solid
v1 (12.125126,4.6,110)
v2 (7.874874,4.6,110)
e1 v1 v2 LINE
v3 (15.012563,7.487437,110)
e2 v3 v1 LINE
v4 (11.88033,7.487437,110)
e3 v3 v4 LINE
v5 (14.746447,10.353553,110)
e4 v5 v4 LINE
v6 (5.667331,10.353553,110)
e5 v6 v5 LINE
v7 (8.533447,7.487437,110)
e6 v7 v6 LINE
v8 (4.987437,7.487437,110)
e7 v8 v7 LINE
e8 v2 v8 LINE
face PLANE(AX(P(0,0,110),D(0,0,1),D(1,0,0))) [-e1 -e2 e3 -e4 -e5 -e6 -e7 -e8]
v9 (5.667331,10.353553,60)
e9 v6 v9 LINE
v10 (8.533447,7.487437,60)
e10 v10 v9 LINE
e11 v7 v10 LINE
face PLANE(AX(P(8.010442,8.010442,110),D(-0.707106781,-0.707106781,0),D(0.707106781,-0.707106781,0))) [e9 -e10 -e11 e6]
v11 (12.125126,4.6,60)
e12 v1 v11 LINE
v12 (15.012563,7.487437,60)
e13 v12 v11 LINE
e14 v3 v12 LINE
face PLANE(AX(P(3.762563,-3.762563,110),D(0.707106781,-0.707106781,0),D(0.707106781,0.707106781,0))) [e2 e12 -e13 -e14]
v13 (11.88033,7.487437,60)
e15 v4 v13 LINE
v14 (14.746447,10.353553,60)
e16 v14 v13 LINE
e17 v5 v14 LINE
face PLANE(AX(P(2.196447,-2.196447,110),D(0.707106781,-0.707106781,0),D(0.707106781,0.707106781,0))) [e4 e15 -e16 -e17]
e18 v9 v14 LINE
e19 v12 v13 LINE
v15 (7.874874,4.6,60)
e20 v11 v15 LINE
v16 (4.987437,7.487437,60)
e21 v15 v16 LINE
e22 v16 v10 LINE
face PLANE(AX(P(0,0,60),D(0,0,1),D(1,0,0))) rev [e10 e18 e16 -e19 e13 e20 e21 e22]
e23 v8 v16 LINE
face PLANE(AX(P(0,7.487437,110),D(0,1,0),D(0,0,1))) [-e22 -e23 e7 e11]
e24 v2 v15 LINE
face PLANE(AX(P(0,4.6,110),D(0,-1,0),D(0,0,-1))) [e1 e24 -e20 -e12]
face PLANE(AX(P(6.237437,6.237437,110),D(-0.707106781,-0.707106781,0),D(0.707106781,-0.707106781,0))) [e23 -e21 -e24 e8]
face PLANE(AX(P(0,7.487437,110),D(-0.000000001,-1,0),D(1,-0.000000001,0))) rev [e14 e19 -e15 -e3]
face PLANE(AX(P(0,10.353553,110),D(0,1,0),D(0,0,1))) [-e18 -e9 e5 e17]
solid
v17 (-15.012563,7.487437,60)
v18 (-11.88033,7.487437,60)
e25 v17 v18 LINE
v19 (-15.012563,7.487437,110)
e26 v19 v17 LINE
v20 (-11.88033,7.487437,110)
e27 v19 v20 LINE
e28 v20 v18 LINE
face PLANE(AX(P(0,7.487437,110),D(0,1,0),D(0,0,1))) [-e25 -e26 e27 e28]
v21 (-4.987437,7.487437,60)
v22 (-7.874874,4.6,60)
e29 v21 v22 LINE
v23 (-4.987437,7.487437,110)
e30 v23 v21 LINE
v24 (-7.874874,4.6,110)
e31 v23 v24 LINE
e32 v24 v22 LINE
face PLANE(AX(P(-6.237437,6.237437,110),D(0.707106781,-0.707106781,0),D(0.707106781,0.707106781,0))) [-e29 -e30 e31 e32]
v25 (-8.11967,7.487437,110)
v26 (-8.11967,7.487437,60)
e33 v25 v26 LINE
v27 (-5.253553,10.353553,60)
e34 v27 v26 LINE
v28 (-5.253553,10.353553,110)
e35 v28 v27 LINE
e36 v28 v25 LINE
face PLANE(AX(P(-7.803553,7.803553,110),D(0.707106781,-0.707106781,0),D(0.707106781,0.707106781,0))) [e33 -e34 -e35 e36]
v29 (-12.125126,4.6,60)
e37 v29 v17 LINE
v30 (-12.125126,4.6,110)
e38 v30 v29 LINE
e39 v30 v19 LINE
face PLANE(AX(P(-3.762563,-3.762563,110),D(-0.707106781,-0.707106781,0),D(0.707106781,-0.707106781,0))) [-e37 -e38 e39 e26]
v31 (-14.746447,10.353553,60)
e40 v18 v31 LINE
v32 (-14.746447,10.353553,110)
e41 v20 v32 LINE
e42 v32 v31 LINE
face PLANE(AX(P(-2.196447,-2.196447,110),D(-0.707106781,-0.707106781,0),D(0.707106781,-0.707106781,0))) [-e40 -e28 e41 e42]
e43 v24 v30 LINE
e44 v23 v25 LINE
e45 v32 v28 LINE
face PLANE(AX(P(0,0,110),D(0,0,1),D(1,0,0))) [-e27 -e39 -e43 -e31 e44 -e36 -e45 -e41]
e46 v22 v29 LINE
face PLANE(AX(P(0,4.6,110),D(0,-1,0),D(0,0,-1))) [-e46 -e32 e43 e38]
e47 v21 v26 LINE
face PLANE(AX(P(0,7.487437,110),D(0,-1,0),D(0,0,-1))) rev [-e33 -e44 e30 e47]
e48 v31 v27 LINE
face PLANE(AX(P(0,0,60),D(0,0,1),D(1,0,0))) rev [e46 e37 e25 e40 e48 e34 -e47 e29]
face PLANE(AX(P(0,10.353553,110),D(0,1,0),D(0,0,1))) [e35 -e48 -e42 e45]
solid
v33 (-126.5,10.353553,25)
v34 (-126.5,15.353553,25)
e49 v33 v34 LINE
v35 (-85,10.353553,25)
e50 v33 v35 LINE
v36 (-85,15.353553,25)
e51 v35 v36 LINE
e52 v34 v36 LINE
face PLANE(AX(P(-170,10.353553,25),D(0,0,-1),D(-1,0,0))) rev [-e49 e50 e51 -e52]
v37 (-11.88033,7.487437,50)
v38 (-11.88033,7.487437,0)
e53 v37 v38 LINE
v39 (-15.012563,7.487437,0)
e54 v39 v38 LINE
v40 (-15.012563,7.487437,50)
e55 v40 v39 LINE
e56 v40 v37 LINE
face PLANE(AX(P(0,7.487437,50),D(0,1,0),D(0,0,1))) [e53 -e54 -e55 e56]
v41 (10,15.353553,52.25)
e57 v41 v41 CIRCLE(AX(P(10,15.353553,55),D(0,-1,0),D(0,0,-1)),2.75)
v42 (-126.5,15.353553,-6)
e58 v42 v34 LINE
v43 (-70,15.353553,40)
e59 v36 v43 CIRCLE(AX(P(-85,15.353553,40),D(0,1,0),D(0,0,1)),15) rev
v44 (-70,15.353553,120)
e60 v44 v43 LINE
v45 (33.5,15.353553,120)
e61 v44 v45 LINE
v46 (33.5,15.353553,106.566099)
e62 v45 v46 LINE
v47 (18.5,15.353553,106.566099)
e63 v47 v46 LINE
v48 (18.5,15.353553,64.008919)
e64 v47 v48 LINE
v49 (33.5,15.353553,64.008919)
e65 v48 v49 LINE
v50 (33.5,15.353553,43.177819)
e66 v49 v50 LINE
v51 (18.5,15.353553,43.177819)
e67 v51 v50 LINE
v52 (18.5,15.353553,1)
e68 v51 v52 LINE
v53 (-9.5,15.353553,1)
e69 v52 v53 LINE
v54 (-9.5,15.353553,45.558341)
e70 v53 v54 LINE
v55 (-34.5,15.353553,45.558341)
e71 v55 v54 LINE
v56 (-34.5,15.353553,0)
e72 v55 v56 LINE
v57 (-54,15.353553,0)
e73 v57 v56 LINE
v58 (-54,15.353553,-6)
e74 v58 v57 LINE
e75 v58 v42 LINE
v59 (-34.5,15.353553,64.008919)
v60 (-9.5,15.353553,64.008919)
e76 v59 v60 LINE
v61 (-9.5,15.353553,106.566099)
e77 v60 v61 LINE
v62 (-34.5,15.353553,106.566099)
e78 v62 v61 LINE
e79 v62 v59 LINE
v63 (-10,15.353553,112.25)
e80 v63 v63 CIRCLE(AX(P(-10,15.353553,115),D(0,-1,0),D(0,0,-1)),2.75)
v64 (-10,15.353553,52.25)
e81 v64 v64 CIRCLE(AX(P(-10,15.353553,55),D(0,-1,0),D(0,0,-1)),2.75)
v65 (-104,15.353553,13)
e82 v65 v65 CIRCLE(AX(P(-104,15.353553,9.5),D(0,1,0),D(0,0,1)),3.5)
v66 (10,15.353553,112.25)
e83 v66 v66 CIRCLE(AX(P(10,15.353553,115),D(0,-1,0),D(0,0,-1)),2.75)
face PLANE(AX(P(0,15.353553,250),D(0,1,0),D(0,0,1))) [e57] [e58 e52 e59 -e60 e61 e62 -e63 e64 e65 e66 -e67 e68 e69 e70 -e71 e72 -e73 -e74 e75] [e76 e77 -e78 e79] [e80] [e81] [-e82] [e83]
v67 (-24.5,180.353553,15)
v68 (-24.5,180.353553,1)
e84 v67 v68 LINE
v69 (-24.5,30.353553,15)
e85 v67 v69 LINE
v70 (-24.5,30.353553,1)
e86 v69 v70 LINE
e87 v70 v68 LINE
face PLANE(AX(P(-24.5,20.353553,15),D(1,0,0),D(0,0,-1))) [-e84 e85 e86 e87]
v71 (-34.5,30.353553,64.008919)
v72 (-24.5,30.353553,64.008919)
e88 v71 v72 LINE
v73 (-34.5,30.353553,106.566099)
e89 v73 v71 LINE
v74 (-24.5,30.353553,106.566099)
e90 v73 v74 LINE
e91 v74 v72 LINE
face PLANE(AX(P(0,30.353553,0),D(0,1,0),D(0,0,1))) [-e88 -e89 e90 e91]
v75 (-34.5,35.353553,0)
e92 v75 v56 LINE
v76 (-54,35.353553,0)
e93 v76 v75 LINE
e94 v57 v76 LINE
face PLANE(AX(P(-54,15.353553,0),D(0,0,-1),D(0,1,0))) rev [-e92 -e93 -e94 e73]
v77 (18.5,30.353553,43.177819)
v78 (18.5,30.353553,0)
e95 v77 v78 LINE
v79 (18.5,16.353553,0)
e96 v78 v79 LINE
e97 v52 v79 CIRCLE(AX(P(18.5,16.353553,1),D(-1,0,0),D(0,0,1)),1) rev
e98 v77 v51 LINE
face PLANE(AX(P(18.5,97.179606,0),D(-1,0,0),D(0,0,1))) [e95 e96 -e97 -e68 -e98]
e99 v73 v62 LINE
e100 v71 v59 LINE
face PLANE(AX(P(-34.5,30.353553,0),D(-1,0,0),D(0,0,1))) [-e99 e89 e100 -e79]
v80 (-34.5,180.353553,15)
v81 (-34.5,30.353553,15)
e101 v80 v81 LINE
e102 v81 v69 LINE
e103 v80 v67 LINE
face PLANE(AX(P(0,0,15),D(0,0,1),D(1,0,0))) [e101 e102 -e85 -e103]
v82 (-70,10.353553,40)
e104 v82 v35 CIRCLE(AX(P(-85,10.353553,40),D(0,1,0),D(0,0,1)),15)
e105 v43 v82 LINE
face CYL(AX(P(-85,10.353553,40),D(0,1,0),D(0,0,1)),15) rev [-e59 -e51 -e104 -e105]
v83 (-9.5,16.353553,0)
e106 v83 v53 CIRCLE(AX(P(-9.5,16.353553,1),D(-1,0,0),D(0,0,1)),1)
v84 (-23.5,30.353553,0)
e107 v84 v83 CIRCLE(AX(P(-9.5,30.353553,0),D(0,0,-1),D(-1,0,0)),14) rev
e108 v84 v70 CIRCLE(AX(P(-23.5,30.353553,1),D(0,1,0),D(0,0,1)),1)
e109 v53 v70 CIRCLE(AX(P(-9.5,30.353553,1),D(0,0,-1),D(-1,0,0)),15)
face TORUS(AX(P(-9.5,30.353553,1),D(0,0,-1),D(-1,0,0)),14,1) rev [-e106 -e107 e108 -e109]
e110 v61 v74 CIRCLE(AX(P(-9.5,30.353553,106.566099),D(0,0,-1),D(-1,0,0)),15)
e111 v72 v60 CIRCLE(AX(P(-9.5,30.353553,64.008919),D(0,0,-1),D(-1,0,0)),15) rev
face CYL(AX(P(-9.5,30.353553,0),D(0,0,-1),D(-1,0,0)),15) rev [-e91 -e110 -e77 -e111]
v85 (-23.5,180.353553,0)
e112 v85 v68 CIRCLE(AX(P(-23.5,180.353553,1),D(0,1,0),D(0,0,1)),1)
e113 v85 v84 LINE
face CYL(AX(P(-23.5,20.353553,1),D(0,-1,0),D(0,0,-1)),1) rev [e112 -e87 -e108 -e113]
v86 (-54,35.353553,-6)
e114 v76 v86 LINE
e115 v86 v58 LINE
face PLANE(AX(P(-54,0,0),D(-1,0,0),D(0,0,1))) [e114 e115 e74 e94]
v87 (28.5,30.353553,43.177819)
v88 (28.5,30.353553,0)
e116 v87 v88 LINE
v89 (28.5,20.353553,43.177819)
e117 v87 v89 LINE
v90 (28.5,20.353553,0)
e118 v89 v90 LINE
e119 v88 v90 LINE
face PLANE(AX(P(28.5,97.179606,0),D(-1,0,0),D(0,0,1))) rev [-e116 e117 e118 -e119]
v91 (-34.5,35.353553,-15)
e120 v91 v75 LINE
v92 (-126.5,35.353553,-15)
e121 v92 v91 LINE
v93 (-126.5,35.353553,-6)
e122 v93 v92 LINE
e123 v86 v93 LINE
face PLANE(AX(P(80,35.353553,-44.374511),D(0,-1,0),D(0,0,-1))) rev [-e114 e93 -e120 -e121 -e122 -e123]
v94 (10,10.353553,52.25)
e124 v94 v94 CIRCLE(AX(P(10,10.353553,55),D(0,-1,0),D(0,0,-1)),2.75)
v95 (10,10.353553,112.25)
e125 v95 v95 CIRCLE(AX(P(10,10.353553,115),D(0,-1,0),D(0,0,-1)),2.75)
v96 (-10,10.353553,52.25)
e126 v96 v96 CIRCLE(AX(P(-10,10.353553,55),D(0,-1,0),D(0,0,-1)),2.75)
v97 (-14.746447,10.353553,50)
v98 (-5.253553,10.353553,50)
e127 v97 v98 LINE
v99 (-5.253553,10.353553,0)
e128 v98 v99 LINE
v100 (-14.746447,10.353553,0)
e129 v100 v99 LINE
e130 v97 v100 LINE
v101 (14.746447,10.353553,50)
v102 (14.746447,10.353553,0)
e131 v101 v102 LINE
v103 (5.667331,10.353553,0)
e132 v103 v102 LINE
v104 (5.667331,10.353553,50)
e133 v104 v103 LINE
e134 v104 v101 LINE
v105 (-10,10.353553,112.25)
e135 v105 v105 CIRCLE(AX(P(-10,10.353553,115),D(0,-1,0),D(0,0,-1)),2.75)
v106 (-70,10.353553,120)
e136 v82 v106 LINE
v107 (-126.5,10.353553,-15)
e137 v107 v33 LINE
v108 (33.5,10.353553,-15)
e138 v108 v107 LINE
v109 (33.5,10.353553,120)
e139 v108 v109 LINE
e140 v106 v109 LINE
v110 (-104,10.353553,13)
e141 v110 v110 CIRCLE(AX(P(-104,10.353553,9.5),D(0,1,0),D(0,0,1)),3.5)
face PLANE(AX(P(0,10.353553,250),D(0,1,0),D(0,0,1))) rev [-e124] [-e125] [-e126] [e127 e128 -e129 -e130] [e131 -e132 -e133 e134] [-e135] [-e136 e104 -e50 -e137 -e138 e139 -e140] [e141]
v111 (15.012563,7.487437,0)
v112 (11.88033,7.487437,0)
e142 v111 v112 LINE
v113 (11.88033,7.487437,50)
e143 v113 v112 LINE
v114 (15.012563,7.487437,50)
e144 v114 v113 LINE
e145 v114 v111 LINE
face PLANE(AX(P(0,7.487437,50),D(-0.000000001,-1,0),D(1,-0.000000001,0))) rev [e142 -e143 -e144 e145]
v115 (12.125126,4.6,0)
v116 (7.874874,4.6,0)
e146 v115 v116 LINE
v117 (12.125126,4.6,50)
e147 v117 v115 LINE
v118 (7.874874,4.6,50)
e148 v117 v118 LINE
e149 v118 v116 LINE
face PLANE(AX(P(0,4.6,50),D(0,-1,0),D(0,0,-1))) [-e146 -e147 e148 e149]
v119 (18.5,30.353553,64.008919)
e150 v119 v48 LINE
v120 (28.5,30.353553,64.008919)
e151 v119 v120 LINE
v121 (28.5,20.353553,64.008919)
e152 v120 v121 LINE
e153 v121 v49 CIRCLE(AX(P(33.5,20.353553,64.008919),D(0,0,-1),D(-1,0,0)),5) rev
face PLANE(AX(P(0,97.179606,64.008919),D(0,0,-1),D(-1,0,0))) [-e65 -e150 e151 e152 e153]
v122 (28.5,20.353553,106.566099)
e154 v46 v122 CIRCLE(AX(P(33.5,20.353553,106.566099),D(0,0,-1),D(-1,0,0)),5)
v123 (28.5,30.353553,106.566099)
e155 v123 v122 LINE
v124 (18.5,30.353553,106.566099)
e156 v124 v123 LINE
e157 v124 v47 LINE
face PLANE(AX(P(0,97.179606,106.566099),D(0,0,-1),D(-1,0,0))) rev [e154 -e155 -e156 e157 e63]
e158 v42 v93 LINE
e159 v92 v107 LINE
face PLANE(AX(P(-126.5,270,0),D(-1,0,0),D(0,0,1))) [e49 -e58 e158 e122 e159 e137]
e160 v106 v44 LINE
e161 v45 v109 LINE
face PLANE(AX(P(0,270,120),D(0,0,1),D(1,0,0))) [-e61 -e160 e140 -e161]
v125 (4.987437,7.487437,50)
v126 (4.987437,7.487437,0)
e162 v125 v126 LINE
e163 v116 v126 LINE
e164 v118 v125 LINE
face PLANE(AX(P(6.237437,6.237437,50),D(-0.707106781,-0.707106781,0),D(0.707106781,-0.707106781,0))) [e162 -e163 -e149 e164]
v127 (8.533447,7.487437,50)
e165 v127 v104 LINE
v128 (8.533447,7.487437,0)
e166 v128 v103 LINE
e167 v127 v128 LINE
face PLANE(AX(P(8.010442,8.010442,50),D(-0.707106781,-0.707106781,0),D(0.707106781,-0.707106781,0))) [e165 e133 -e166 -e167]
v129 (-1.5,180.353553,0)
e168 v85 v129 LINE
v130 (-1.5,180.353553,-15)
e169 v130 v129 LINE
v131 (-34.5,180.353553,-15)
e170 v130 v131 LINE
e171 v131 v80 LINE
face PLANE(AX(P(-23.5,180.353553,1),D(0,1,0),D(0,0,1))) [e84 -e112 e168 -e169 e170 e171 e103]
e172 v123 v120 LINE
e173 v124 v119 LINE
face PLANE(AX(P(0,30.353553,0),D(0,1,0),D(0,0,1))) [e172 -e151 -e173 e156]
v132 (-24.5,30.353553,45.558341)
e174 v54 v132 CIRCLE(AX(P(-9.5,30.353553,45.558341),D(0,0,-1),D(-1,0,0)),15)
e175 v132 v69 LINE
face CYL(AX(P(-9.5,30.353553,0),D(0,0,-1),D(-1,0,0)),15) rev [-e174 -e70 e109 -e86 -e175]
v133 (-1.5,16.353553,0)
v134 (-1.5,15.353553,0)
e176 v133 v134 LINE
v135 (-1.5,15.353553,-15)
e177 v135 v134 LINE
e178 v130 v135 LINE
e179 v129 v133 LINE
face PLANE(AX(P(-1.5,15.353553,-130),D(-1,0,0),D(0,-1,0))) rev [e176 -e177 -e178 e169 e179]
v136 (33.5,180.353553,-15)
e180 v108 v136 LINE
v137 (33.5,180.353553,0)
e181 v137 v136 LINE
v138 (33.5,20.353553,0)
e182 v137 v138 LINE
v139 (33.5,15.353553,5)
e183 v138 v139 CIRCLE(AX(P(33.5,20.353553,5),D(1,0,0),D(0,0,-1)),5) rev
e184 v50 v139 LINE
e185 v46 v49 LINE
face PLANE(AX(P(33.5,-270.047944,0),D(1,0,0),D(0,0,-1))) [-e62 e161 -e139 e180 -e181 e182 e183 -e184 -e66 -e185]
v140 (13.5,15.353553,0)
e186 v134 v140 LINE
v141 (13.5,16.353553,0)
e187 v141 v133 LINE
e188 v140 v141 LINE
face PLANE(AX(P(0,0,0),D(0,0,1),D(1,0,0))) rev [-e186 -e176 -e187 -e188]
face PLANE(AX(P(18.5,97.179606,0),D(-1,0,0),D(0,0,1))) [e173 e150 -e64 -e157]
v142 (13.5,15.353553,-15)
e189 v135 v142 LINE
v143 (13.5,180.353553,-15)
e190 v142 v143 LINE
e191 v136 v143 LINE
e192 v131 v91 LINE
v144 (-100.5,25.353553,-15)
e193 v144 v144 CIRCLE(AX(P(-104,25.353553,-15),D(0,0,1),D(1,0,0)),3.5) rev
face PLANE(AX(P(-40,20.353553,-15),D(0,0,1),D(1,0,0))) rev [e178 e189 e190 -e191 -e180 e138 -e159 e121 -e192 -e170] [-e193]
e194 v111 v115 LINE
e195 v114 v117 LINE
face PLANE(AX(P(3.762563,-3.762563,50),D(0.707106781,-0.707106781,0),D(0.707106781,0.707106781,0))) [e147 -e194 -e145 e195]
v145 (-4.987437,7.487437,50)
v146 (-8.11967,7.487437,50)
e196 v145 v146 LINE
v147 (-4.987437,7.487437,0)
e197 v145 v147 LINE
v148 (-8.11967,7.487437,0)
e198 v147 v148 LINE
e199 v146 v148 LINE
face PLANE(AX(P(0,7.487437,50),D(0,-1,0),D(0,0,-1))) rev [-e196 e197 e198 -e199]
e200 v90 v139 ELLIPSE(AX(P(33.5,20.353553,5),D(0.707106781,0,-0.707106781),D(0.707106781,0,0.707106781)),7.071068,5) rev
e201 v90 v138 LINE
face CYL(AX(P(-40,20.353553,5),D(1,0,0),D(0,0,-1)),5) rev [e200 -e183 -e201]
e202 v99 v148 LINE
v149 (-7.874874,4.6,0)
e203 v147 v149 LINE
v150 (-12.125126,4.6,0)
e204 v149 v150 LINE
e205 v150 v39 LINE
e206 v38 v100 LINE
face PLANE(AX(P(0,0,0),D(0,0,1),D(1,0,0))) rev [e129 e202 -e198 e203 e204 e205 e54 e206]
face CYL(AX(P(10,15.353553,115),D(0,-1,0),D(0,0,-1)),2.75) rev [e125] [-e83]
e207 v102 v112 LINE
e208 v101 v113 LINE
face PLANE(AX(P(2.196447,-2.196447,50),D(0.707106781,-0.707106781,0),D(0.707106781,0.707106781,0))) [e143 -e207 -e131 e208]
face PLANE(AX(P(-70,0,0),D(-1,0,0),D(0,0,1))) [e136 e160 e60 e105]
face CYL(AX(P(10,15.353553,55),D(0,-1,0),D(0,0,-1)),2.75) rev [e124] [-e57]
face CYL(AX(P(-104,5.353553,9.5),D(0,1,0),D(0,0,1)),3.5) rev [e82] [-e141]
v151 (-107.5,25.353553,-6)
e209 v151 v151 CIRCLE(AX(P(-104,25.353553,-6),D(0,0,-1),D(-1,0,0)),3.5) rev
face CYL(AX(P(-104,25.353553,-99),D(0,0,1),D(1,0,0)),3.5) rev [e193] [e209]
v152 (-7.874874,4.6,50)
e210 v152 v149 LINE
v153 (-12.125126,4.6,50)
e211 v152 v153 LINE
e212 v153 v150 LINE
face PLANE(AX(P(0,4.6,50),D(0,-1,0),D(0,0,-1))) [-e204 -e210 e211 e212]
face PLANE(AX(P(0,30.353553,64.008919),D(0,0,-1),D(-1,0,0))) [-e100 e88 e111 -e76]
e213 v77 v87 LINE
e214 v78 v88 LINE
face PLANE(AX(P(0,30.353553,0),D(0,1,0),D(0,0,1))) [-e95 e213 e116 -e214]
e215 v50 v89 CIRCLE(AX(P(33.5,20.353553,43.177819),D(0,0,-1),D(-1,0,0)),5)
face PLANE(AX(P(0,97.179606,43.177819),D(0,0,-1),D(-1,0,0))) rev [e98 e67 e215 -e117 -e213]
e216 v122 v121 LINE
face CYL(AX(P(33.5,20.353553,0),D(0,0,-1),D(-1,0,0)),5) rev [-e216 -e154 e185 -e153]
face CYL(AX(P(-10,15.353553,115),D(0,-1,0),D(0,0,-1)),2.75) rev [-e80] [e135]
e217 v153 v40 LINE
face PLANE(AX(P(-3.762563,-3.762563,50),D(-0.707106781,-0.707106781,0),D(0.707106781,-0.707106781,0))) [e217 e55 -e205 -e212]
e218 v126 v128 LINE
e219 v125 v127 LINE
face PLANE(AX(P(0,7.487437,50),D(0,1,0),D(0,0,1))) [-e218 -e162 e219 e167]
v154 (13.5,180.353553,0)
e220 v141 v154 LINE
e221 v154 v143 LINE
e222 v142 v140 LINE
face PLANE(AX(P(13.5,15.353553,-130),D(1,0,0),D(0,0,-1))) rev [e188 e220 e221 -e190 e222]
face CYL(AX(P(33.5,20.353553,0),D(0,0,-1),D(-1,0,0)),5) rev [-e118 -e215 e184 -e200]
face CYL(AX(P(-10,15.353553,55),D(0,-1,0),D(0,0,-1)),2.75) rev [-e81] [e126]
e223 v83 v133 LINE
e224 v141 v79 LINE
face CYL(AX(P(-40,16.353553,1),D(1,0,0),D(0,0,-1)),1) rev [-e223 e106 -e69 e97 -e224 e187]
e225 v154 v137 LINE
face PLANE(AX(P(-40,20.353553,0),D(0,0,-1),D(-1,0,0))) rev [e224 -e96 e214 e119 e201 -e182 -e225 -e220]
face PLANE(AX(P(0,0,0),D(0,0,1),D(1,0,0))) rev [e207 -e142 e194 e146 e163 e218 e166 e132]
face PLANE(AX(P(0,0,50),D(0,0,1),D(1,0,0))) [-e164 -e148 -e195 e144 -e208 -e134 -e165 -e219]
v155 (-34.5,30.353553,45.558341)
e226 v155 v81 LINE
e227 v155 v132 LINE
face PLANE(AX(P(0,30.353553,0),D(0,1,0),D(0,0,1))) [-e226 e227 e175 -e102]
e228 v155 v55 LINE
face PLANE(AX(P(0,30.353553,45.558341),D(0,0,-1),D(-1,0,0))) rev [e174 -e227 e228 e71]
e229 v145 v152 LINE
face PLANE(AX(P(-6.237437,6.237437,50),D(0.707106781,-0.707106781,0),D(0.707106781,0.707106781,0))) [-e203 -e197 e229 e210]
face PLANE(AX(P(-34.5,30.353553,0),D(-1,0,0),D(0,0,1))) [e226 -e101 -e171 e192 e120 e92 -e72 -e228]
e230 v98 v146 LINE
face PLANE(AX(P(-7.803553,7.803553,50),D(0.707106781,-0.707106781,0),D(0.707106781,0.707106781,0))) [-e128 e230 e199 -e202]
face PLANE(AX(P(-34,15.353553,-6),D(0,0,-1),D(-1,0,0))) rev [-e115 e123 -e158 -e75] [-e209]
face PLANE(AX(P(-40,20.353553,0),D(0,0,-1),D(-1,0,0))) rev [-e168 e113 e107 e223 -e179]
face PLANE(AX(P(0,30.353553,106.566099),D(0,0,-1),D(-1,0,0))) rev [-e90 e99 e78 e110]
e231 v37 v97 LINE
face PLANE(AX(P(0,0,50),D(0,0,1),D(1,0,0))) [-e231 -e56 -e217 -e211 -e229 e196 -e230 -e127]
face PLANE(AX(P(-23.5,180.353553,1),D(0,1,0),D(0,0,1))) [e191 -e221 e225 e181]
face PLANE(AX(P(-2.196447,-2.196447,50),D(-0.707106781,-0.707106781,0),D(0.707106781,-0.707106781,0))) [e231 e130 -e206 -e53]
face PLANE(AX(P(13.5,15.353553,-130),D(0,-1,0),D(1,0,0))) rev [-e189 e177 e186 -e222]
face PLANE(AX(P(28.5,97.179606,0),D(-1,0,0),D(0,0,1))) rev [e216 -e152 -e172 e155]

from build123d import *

# Parameters (mm, degrees)
BOSS_EXTRUDE1_DEPTH      = 250
BOSS_EXTRUDE2_DEPTH      = 50
BOSS_EXTRUDE2_2_DEPTH    = 50
LPATTERN1_COUNT          = 4
LPATTERN1_PITCH          = 60
SKETCH2_R                = 2.75
CUT_EXTRUDE1_DEPTH       = 251.864711302
UPPER_ACRYLIC_SUPP_W     = 20
UPPER_ACRYLIC_SUPP_H     = 250
BOSS_EXTRUDE3_DEPTH      = 5
UPPER_ACRYLIC_SUPP_3_W   = 10
UPPER_ACRYLIC_SUPP_3_H   = 66.073604859
UPPER_ACRYLIC_SUPP_3_H_2 = 41.475217291
UPPER_ACRYLIC_SUPP_3_H_3 = 42.557179481
UPPER_ACRYLIC_SUPP_3_H_4 = 45.558340935
BOSS_EXTRUDE4_DEPTH      = 15
FILLET1_R                = 15
SKETCH4_W                = 60
SKETCH4_H                = 15
BOSS_EXTRUDE5_DEPTH      = 5
SKETCH4_3_W              = 60
SKETCH4_3_H              = 15
BOSS_EXTRUDE6_DEPTH      = 60
SKETCH5_W                = 10
SKETCH5_H                = 45
BOSS_EXTRUDE7_DEPTH      = 15
BOSS_EXTRUDE8_START      = 250
SKETCH5_3_W              = 10
SKETCH5_3_H              = 45
BOSS_EXTRUDE8_DEPTH      = 15
FILLET2_R                = 1
SKETCH6_W                = 6
SKETCH6_H                = 60
CUT_EXTRUDE2_DEPTH       = 6
BOSS_EXTRUDE9_DEPTH      = 30
SKETCH8_W                = 333.602701612
SKETCH8_H                = 59.031331047
CUT_EXTRUDE3_DEPTH       = 150
SKETCH9_W                = 6
SKETCH9_H                = 20
CLOTH_ESCAPE_GAP_DEPTH   = 20
SKETCH11_W               = 9
SKETCH11_H               = 20
BOSS_EXTRUDE11_DEPTH     = 100
CUT_EXTRUDE4_DEPTH       = 68
SKETCH13_W               = 40
SKETCH13_H               = 5
BOSS_EXTRUDE13_DEPTH     = 100
CUT_EXTRUDE5_DEPTH       = 100
FILLET3_R                = 15
BOSS_EXTRUDE14_START     = -5
BOSS_EXTRUDE14_DEPTH     = 25
CUT_EXTRUDE6_DEPTH       = 30
CUT_EXTRUDE6_DEPTH_BACK  = 10
SKETCH16_5_W             = 8.5
SKETCH16_5_H             = 41.475217291
SKETCH16_5_H_2           = 42.557179481
SKETCH16_5_W_2           = 1.5
SKETCH16_5_H_3           = 42.177819043
SKETCH16_5_H_4           = 20.831100018
SKETCH16_5_H_5           = 17.311395043
SKETCH16_5_H_6           = 18.573684265
SKETCH16_5_H_7           = 65.073604859
SKETCH16_6_W             = 8.5
SKETCH16_6_H             = 41.475217291
SKETCH16_6_H_2           = 42.557179481
SKETCH16_6_W_2           = 1.5
SKETCH16_6_H_3           = 42.177819043
SKETCH16_6_H_4           = 20.831100018
SKETCH16_6_H_5           = 17.311395043
SKETCH16_6_H_6           = 18.573684265
SKETCH16_6_H_7           = 65.073604859
BOSS_EXTRUDE15_DEPTH     = 5
BOSS_EXTRUDE16_DEPTH     = 20
SKETCH16_8_W             = 8.5
SKETCH16_8_H             = 41.475217291
SKETCH16_8_H_2           = 42.557179481
SKETCH16_8_W_2           = 1.5
SKETCH16_8_H_3           = 42.177819043
SKETCH16_8_H_4           = 65.073604859
BOSS_EXTRUDE17_DEPTH     = 15
BOSS_EXTRUDE18_START     = -5
BOSS_EXTRUDE18_DEPTH     = 25
FILLET4_R                = 5
BOSS_EXTRUDE21_START     = 145
BOSS_EXTRUDE21_DEPTH     = 170
SKETCH19_R               = 3.5
CUT_EXTRUDE7_DEPTH       = 10
CUT_EXTRUDE8_DEPTH       = 355
CUT_EXTRUDE8_DEPTH_BACK  = 10
SKETCH20_R               = 3.5
SKETCH21_W               = 15
SKETCH21_H               = 197.501027769
CUT_EXTRUDE9_DEPTH       = 130
SKETCH22_W               = 160
SKETCH22_H               = 135
SKETCH22_H_2             = 10
CUT_EXTRUDE10_DEPTH      = 270


with BuildPart() as part:
    # profile → Boss-Extrude1 (new body)
    with BuildSketch(Plane.XY):
        Polygon((-14.746446609, 10.353553391), (-5.253553391, 10.353553391), (5.667330529, 10.353553391), (14.746446609, 10.353553391), (20, 10.353553391), (20, 15.353553391), (-20, 15.353553391), (-20, 10.353553391), align=None)
    extrude(amount=BOSS_EXTRUDE1_DEPTH)

    # Sketch2 → Cut-Extrude1 (cut, through all)
    with BuildSketch(Plane.XZ.offset(-10.353553391)):
        with Locations(Location((-10, 175, 0), (0, 0, 270))):
            Circle(SKETCH2_R)
        with Locations(Location((10, 175, 0), (0, 0, 270))):
            Circle(SKETCH2_R)
        with Locations(Location((-10, 115, 0), (0, 0, 270))):
            Circle(SKETCH2_R)
        with Locations(Location((10, 115, 0), (0, 0, 270))):
            Circle(SKETCH2_R)
        with Locations(Location((-10, 55, 0), (0, 0, 270))):
            Circle(SKETCH2_R)
        with Locations(Location((10, 55, 0), (0, 0, 270))):
            Circle(SKETCH2_R)
    extrude(amount=-CUT_EXTRUDE1_DEPTH, mode=Mode.SUBTRACT)

    # upper_acrylic_supp → Boss-Extrude3 (add)
    with BuildSketch(Plane(origin=(0, 15.353553391, 0), x_dir=(1, 0, 0), z_dir=(0, 1, 0))):
        with Locations((-30, -125)):
            Rectangle(UPPER_ACRYLIC_SUPP_W, UPPER_ACRYLIC_SUPP_H)
    extrude(amount=-BOSS_EXTRUDE3_DEPTH)

    # upper_acrylic_supp<3> → Boss-Extrude4 (add)
    with BuildSketch(Plane(origin=(0, 15.353553391, 0), x_dir=(1, 0, 0), z_dir=(0, 1, 0))):
        with Locations((-29.5, -216.963197571)):
            Rectangle(UPPER_ACRYLIC_SUPP_3_W, UPPER_ACRYLIC_SUPP_3_H)
        with Locations((-29.5, -144.615102231)):
            Rectangle(UPPER_ACRYLIC_SUPP_3_W, UPPER_ACRYLIC_SUPP_3_H_2)
        with Locations((-29.5, -85.287508801)):
            Rectangle(UPPER_ACRYLIC_SUPP_3_W, UPPER_ACRYLIC_SUPP_3_H_3)
        with Locations((-29.5, -22.779170468)):
            Rectangle(UPPER_ACRYLIC_SUPP_3_W, UPPER_ACRYLIC_SUPP_3_H_4)
    extrude(amount=BOSS_EXTRUDE4_DEPTH)

    # Fillet1
    fillet1_edges = [part.edges().sort_by_distance(p)[0] for p in [
        (-24.5, 15.353553391, 22.779170467),
        (-24.5, 15.353553391, 85.287508801),
        (-24.5, 15.353553391, 144.615102231),
        (-24.5, 15.353553391, 216.963197571),
    ]]
    fillet(fillet1_edges, radius=FILLET1_R - 0.0001)  # a hair under: the kernel refuses the full size



with BuildPart() as body_2:
    # Sketch1<3> → Boss-Extrude2 (new body)
    with BuildSketch(Plane.XY):
        Polygon((-7.253553391, 8.353553391), (-8.119669914, 7.487436867), (-5.5, 7.487436867), (-4.987436867, 7.487436867), (-5.5, 6.974873734), (-7.874873734, 4.6), (-12.125126266, 4.6), (-14.5, 6.974873734), (-15.012563133, 7.487436867), (-14.5, 7.487436867), (-11.880330086, 7.487436867), (-12.746446609, 8.353553391), (-14.746446609, 10.353553391), (-5.253553391, 10.353553391), align=None)
    boss_extrude2 = extrude(amount=BOSS_EXTRUDE2_DEPTH)


with BuildPart() as body_3:
    # Sketch1<3> → Boss-Extrude2 2 (new body)
    with BuildSketch(Plane.XY):
        Polygon((12.746446609, 8.353553391), (11.880330086, 7.487436867), (14.5, 7.487436867), (15.012563133, 7.487436867), (14.5, 6.974873734), (12.125126266, 4.6), (7.874873734, 4.6), (5.5, 6.974873734), (4.987436867, 7.487436867), (5.5, 7.487436867), (8.533447053, 7.487436867), (7.667330529, 8.353553391), (5.667330529, 10.353553391), (14.746446609, 10.353553391), align=None)
    boss_extrude2_2 = extrude(amount=BOSS_EXTRUDE2_2_DEPTH)


with BuildPart() as lpattern1_1:
    # LPattern1: pattern copy
    add(boss_extrude2.moved(Location(Vector(0, 0, 1) * (1 * LPATTERN1_PITCH))))


with BuildPart() as lpattern1_2:
    # LPattern1: pattern copy
    add(boss_extrude2.moved(Location(Vector(0, 0, 1) * (2 * LPATTERN1_PITCH))))


with BuildPart() as lpattern1_3:
    # LPattern1: pattern copy
    add(boss_extrude2.moved(Location(Vector(0, 0, 1) * (3 * LPATTERN1_PITCH))))


with BuildPart() as lpattern1_4:
    # LPattern1: pattern copy
    add(boss_extrude2_2.moved(Location(Vector(0, 0, 1) * (1 * LPATTERN1_PITCH))))


with BuildPart() as lpattern1_5:
    # LPattern1: pattern copy
    add(boss_extrude2_2.moved(Location(Vector(0, 0, 1) * (2 * LPATTERN1_PITCH))))


with BuildPart() as lpattern1_6:
    # LPattern1: pattern copy
    add(boss_extrude2_2.moved(Location(Vector(0, 0, 1) * (3 * LPATTERN1_PITCH))))


with BuildPart() as part_1:
    add(part.part)

    add(body_2.part)  # Boss-Extrude5 merges body 2

    add(body_3.part)  # Boss-Extrude5 merges body 3
    # Sketch4 → Boss-Extrude5 (add, symmetric)
    with BuildSketch(Plane(origin=(0, 15.353553391, 0), x_dir=(1, 0, 0), z_dir=(0, 1, 0))):
        with Locations((-10, -257.5)):
            Rectangle(SKETCH4_W, SKETCH4_H)
        with Locations((-10, 7.5)):
            Rectangle(SKETCH4_W, SKETCH4_H)
    extrude(amount=BOSS_EXTRUDE5_DEPTH, both=True)

    # Sketch4<3> → Boss-Extrude6 (add)
    with BuildSketch(Plane(origin=(0, 15.353553391, 0), x_dir=(1, 0, 0), z_dir=(0, 1, 0))):
        with Locations((-10, -257.5)):
            Rectangle(SKETCH4_3_W, SKETCH4_3_H)
        with Locations((-10, 7.5)):
            Rectangle(SKETCH4_3_W, SKETCH4_3_H)
    extrude(amount=BOSS_EXTRUDE6_DEPTH)

    # Sketch5 → Boss-Extrude7 (add)
    with BuildSketch(Plane(origin=(0, 0, 250), x_dir=(-1, 0, 0), z_dir=(0, 0, -1))):
        with Locations((29.5, 52.853553391)):
            Rectangle(SKETCH5_W, SKETCH5_H)
    extrude(amount=BOSS_EXTRUDE7_DEPTH)

    # Sketch5<3> → Boss-Extrude8 (add)
    with BuildSketch(Plane(origin=(0, 0, 250), x_dir=(-1, 0, 0), z_dir=(0, 0, -1)).offset(BOSS_EXTRUDE8_START)):
        with Locations((29.5, 52.853553391)):
            Rectangle(SKETCH5_3_W, SKETCH5_3_H)
    extrude(amount=-BOSS_EXTRUDE8_DEPTH)

    # Fillet2
    fillet2_edges = [part_1.edges().sort_by_distance(p)[0] for p in [
        (-24.5, 52.853503391, 250),
        (-24.5, 52.853503391, 0),
        (5.24995, 15.353553391, 250),
        (-20.106631007, 19.746922384, 250),
        (-20.106631007, 19.746922384, 0),
        (5.24995, 15.353553391, 0),
    ]]
    fillet(fillet2_edges, radius=FILLET2_R)

    # Sketch6 → Cut-Extrude2 (cut)
    with BuildSketch(Plane.ZY.offset(40)):
        with Locations((253, 45.353553391)):
            Rectangle(SKETCH6_W, SKETCH6_H)
        with Locations((-3, 45.353553391)):
            Rectangle(SKETCH6_W, SKETCH6_H)
    extrude(amount=-CUT_EXTRUDE2_DEPTH, mode=Mode.SUBTRACT)

    # Sketch7 → Boss-Extrude9 (add)
    with BuildSketch(Plane.ZY.offset(40)):
        Polygon((265, 75.353553391), (256, 75.353553391), (256, 15.353553391), (-6, 15.353553391), (-6, 75.353553391), (-15, 75.353553391), (-15, 10.353553391), (265, 10.353553391), align=None)
    extrude(amount=BOSS_EXTRUDE9_DEPTH)

    # Sketch8 → Cut-Extrude3 (cut)
    with BuildSketch(Plane.ZY.offset(70)):
        with Locations((122.426839416, 64.869218915)):
            Rectangle(SKETCH8_W, SKETCH8_H)
    extrude(amount=-CUT_EXTRUDE3_DEPTH, mode=Mode.SUBTRACT)

    # Sketch9 → cloth_escape_gap (add)
    with BuildSketch(Plane.ZY.offset(34)):
        with Locations((253, 25.353553391)):
            Rectangle(SKETCH9_W, SKETCH9_H)
        with Locations((-3, 25.353553391)):
            Rectangle(SKETCH9_W, SKETCH9_H)
    extrude(amount=CLOTH_ESCAPE_GAP_DEPTH)

    # Sketch11 → Boss-Extrude11 (add)
    with BuildSketch(Plane.ZY.offset(70)):
        with Locations((-10.5, 25.353553391)):
            Rectangle(SKETCH11_W, SKETCH11_H)
        with Locations((260.5, 25.353553391)):
            Rectangle(SKETCH11_W, SKETCH11_H)
    extrude(amount=BOSS_EXTRUDE11_DEPTH)

    # Sketch12 → Cut-Extrude4 (cut)
    with BuildSketch(Plane.XZ.offset(-10.353553391)):
        Polygon((-170, 265), (-70, 265), (-170, 260.5), align=None)
        Polygon((-70, -15), (-170, -10.5), (-170, -15), align=None)
    extrude(amount=-CUT_EXTRUDE4_DEPTH, mode=Mode.SUBTRACT)

    # Sketch13 → Boss-Extrude13 (add)
    with BuildSketch(Plane.ZY.offset(70)):
        with Locations((5, 12.853553391)):
            Rectangle(SKETCH13_W, SKETCH13_H)
        with Locations((245, 12.853553391)):
            Rectangle(SKETCH13_W, SKETCH13_H)
    extrude(amount=BOSS_EXTRUDE13_DEPTH)

    # Sketch14 → Cut-Extrude5 (cut)
    with BuildSketch(Plane(origin=(0, 15.353553391, 0), x_dir=(1, 0, 0), z_dir=(0, 1, 0))):
        Polygon((-70, -265), (-170, -260.5), (-170, -265), align=None)
        Polygon((-170, 15), (-170, 10.5), (-70, 15), align=None)
    extrude(amount=-CUT_EXTRUDE5_DEPTH, mode=Mode.SUBTRACT)

    # Fillet3
    fillet3_edges = [part_1.edges().sort_by_distance(p)[0] for p in [
        (-70, 12.853553391, 25),
        (-70, 12.853553391, 225),
    ]]
    fillet(fillet3_edges, radius=FILLET3_R)

    # Sketch16 → Boss-Extrude14 (add)
    with BuildSketch(Plane(origin=(0, 15.353553391, 0), x_dir=(1, 0, 0), z_dir=(0, 1, 0)).offset(BOSS_EXTRUDE14_START)):
        Polygon((28.5, 0), (33.5, 0), (33.5, 15), (18.5, 15), (18.5, 0), align=None)
        Polygon((18.5, -250), (18.5, -265), (33.5, -265), (33.5, -250), (28.5, -250), align=None)
    extrude(amount=BOSS_EXTRUDE14_DEPTH)

    # Sketch16<5> → Cut-Extrude6 (cut, two sides: drawn at the far end of the back side and taken through both)
    with BuildSketch(Plane(origin=(0, 15.353553391, 0), x_dir=(1, 0, 0), z_dir=(0, 1, 0)).offset(-CUT_EXTRUDE6_DEPTH_BACK)):
        Polygon((18.5, -250), (18.5, -265), (33.5, -265), (33.5, -250), (28.5, -250), align=None)
        Polygon((28.5, -250), (33.5, -250), (33.5, 0), (28.5, 0), (28.5, -43.177819043), (20, -43.177819043), (20, -64.008919061), (28.5, -64.008919061), (28.5, -106.566098542), (20, -106.566098542), (20, -123.877493585), (28.5, -123.877493585), (28.5, -165.352710876), (20, -165.352710876), (20, -183.926395141), (28.5, -183.926395141), align=None)
        with Locations((24.25, -144.615102231)):
            Rectangle(SKETCH16_5_W, SKETCH16_5_H)
        with Locations((24.25, -85.287508801)):
            Rectangle(SKETCH16_5_W, SKETCH16_5_H_2)
        Polygon((28.5, -43.177819043), (28.5, 0), (18.5, 0), (18.5, -1), (20, -1), (20, -43.177819043), align=None)
        Polygon((28.5, 0), (33.5, 0), (33.5, 15), (18.5, 15), (18.5, 0), align=None)
        with Locations((19.25, -22.088909521)):
            Rectangle(SKETCH16_5_W_2, SKETCH16_5_H_3)
        with Locations((19.25, -53.593369052)):
            Rectangle(SKETCH16_5_W_2, SKETCH16_5_H_4)
        with Locations((19.25, -85.287508801)):
            Rectangle(SKETCH16_5_W_2, SKETCH16_5_H_2)
        with Locations((19.25, -115.221796064)):
            Rectangle(SKETCH16_5_W_2, SKETCH16_5_H_5)
        with Locations((19.25, -144.615102231)):
            Rectangle(SKETCH16_5_W_2, SKETCH16_5_H)
        with Locations((19.25, -174.639553009)):
            Rectangle(SKETCH16_5_W_2, SKETCH16_5_H_6)
        with Locations((19.25, -216.463197571)):
            Rectangle(SKETCH16_5_W_2, SKETCH16_5_H_7)
        Polygon((18.5, -249), (18.5, -250), (28.5, -250), (28.5, -183.926395141), (20, -183.926395141), (20, -249), align=None)
    extrude(amount=CUT_EXTRUDE6_DEPTH + CUT_EXTRUDE6_DEPTH_BACK, mode=Mode.SUBTRACT)

    # Sketch16<6> → Boss-Extrude15 (add)
    with BuildSketch(Plane(origin=(0, 15.353553391, 0), x_dir=(1, 0, 0), z_dir=(0, 1, 0))):
        Polygon((28.5, -250), (33.5, -250), (33.5, 0), (28.5, 0), (28.5, -43.177819043), (20, -43.177819043), (20, -64.008919061), (28.5, -64.008919061), (28.5, -106.566098542), (20, -106.566098542), (20, -123.877493585), (28.5, -123.877493585), (28.5, -165.352710876), (20, -165.352710876), (20, -183.926395141), (28.5, -183.926395141), align=None)
        Polygon((18.5, -249), (18.5, -250), (28.5, -250), (28.5, -183.926395141), (20, -183.926395141), (20, -249), align=None)
        Polygon((18.5, -250), (18.5, -265), (33.5, -265), (33.5, -250), (28.5, -250), align=None)
        with Locations((24.25, -144.615102231)):
            Rectangle(SKETCH16_6_W, SKETCH16_6_H)
        with Locations((24.25, -85.287508801)):
            Rectangle(SKETCH16_6_W, SKETCH16_6_H_2)
        Polygon((28.5, -43.177819043), (28.5, 0), (18.5, 0), (18.5, -1), (20, -1), (20, -43.177819043), align=None)
        Polygon((28.5, 0), (33.5, 0), (33.5, 15), (18.5, 15), (18.5, 0), align=None)
        with Locations((19.25, -22.088909521)):
            Rectangle(SKETCH16_6_W_2, SKETCH16_6_H_3)
        with Locations((19.25, -53.593369052)):
            Rectangle(SKETCH16_6_W_2, SKETCH16_6_H_4)
        with Locations((19.25, -85.287508801)):
            Rectangle(SKETCH16_6_W_2, SKETCH16_6_H_2)
        with Locations((19.25, -115.221796064)):
            Rectangle(SKETCH16_6_W_2, SKETCH16_6_H_5)
        with Locations((19.25, -144.615102231)):
            Rectangle(SKETCH16_6_W_2, SKETCH16_6_H)
        with Locations((19.25, -174.639553009)):
            Rectangle(SKETCH16_6_W_2, SKETCH16_6_H_6)
        with Locations((19.25, -216.463197571)):
            Rectangle(SKETCH16_6_W_2, SKETCH16_6_H_7)
    extrude(amount=-BOSS_EXTRUDE15_DEPTH)

    # Sketch16<7> → Boss-Extrude16 (add)
    with BuildSketch(Plane(origin=(0, 15.353553391, 0), x_dir=(1, 0, 0), z_dir=(0, 1, 0))):
        Polygon((18.5, -250), (18.5, -265), (33.5, -265), (33.5, -250), (28.5, -250), align=None)
        Polygon((28.5, 0), (33.5, 0), (33.5, 15), (18.5, 15), (18.5, 0), align=None)
    extrude(amount=BOSS_EXTRUDE16_DEPTH)

    # Sketch16<8> → Boss-Extrude17 (add)
    with BuildSketch(Plane(origin=(0, 15.353553391, 0), x_dir=(1, 0, 0), z_dir=(0, 1, 0))):
        Polygon((18.5, -249), (18.5, -250), (28.5, -250), (28.5, -183.926395141), (20, -183.926395141), (20, -249), align=None)
        with Locations((24.25, -144.615102231)):
            Rectangle(SKETCH16_8_W, SKETCH16_8_H)
        with Locations((24.25, -85.287508801)):
            Rectangle(SKETCH16_8_W, SKETCH16_8_H_2)
        Polygon((28.5, -43.177819043), (28.5, 0), (18.5, 0), (18.5, -1), (20, -1), (20, -43.177819043), align=None)
        with Locations((19.25, -22.088909521)):
            Rectangle(SKETCH16_8_W_2, SKETCH16_8_H_3)
        with Locations((19.25, -85.287508801)):
            Rectangle(SKETCH16_8_W_2, SKETCH16_8_H_2)
        with Locations((19.25, -144.615102231)):
            Rectangle(SKETCH16_8_W_2, SKETCH16_8_H)
        with Locations((19.25, -216.463197571)):
            Rectangle(SKETCH16_8_W_2, SKETCH16_8_H_4)
    extrude(amount=BOSS_EXTRUDE17_DEPTH)

    # Sketch14<2> → Boss-Extrude18 (add)
    with BuildSketch(Plane(origin=(0, 15.353553391, 0), x_dir=(1, 0, 0), z_dir=(0, 1, 0)).offset(BOSS_EXTRUDE18_START)):
        Polygon((-70, -265), (-170, -260.5), (-170, -265), align=None)
        Polygon((-170, 15), (-170, 10.5), (-70, 15), align=None)
    extrude(amount=BOSS_EXTRUDE18_DEPTH)

    # Fillet4
    fillet4_edges = [part_1.edges().sort_by_distance(p)[0] for p in [
        (31, 15.353553391, 0),
        (28.5, 15.353553391, 21.588909521),
        (28.5, 15.353553391, 85.287508801),
        (28.5, 15.353553391, 144.615102231),
        (31, 15.353553391, 250),
        (28.5, 15.353553391, 216.963197571),
    ]]
    fillet(fillet4_edges, radius=FILLET4_R - 0.0001)  # a hair under: the kernel refuses the full size

    # Sketch18 → Boss-Extrude21 (add)
    with BuildSketch(Plane(origin=(0, 35.353553391, 0), x_dir=(1, 0, 0), z_dir=(0, 1, 0)).offset(BOSS_EXTRUDE21_START)):
        with BuildLine():
            Line((-34.5, -250), (-34.5, -265))
            Line((-34.5, -265), (33.5, -265))
            Line((33.5, -265), (33.5, -250))
            Line((33.5, -250), (-23.5, -250))
            ThreePointArc((-23.5, -250), (-24.207106781, -249.707106781), (-24.5, -249))
            Line((-24.5, -249), (-24.5, -235))
            Line((-24.5, -235), (-34.5, -235))
            Line((-34.5, -235), (-34.5, -250))
        make_face()
        with BuildLine():
            Line((-34.5, 15), (-34.5, 0))
            Line((-34.5, 0), (-34.5, -15))
            Line((-34.5, -15), (-24.5, -15))
            Line((-24.5, -15), (-24.5, -1))
            ThreePointArc((-24.5, -1), (-24.207106781, -0.292893219), (-23.5, 0))
            Line((-23.5, 0), (33.5, 0))
            Line((33.5, 0), (33.5, 15))
            Line((33.5, 15), (-34.5, 15))
        make_face()
    extrude(amount=-BOSS_EXTRUDE21_DEPTH)

    # Sketch19 → Cut-Extrude7 (cut)
    with BuildSketch(Plane(origin=(0, 15.353553391, 0), x_dir=(1, 0, 0), z_dir=(0, 1, 0))):
        with Locations(Location((-154, -9.5, 0), (0, 0, 270))):
            Circle(SKETCH19_R)
        with Locations(Location((-104, -9.5, 0), (0, 0, 270))):
            Circle(SKETCH19_R)
        with Locations(Location((-104, -240.5, 0), (0, 0, 270))):
            Circle(SKETCH19_R)
        with Locations(Location((-154, -240.5, 0), (0, 0, 270))):
            Circle(SKETCH19_R)
    extrude(amount=-CUT_EXTRUDE7_DEPTH, mode=Mode.SUBTRACT)

    # Sketch20 → Cut-Extrude8 (cut, two sides: drawn at the far end of the back side and taken through both)
    with BuildSketch(Plane(origin=(0, 0, 256), x_dir=(-1, 0, 0), z_dir=(0, 0, -1)).offset(-CUT_EXTRUDE8_DEPTH_BACK)):
        with Locations(Location((104, 25.353553391, 0), (0, 0, 180))):
            Circle(SKETCH20_R)
        with Locations(Location((154, 25.353553391, 0), (0, 0, 180))):
            Circle(SKETCH20_R)
    extrude(amount=CUT_EXTRUDE8_DEPTH + CUT_EXTRUDE8_DEPTH_BACK, mode=Mode.SUBTRACT)

    # Sketch21 → Cut-Extrude9 (cut)
    with BuildSketch(Plane.XY):
        with Locations((6, 114.104067276)):
            Rectangle(SKETCH21_W, SKETCH21_H)
    extrude(amount=-CUT_EXTRUDE9_DEPTH, mode=Mode.SUBTRACT)


with BuildPart() as cut_extrude10_tool:
    # Sketch22 → Cut-Extrude10 (new body)
    with BuildSketch(Plane(origin=(0, 0, 0), x_dir=(1, 0, 0), z_dir=(0, 1, 0))):
        with Locations((-46.5, -197.5)):
            Rectangle(SKETCH22_W, SKETCH22_H)
        Polygon((-126.5, 15), (-186.5, 15), (-186.5, -265), (-126.5, -265), (-126.5, -130), (-126.5, -120), align=None)
        with Locations((-46.5, -125)):
            Rectangle(SKETCH22_W, SKETCH22_H_2)
    extrude(amount=CUT_EXTRUDE10_DEPTH)


with BuildPart() as part_2:
    add(part_1.part)

    # Cut-Extrude10: cut by cut_extrude10_tool
    add(cut_extrude10_tool.part, mode=Mode.SUBTRACT)


with BuildPart() as lpattern1_2_1:
    add(lpattern1_2.part)

    # Cut-Extrude10: cut by cut_extrude10_tool
    add(cut_extrude10_tool.part, mode=Mode.SUBTRACT)


with BuildPart() as lpattern1_3_1:
    add(lpattern1_3.part)

    # Cut-Extrude10: cut by cut_extrude10_tool
    add(cut_extrude10_tool.part, mode=Mode.SUBTRACT)


with BuildPart() as lpattern1_5_1:
    add(lpattern1_5.part)

    # Cut-Extrude10: cut by cut_extrude10_tool
    add(cut_extrude10_tool.part, mode=Mode.SUBTRACT)


with BuildPart() as lpattern1_6_1:
    add(lpattern1_6.part)

    # Cut-Extrude10: cut by cut_extrude10_tool
    add(cut_extrude10_tool.part, mode=Mode.SUBTRACT)


solid = Compound([lpattern1_1.part, lpattern1_4.part, part_2.part])
